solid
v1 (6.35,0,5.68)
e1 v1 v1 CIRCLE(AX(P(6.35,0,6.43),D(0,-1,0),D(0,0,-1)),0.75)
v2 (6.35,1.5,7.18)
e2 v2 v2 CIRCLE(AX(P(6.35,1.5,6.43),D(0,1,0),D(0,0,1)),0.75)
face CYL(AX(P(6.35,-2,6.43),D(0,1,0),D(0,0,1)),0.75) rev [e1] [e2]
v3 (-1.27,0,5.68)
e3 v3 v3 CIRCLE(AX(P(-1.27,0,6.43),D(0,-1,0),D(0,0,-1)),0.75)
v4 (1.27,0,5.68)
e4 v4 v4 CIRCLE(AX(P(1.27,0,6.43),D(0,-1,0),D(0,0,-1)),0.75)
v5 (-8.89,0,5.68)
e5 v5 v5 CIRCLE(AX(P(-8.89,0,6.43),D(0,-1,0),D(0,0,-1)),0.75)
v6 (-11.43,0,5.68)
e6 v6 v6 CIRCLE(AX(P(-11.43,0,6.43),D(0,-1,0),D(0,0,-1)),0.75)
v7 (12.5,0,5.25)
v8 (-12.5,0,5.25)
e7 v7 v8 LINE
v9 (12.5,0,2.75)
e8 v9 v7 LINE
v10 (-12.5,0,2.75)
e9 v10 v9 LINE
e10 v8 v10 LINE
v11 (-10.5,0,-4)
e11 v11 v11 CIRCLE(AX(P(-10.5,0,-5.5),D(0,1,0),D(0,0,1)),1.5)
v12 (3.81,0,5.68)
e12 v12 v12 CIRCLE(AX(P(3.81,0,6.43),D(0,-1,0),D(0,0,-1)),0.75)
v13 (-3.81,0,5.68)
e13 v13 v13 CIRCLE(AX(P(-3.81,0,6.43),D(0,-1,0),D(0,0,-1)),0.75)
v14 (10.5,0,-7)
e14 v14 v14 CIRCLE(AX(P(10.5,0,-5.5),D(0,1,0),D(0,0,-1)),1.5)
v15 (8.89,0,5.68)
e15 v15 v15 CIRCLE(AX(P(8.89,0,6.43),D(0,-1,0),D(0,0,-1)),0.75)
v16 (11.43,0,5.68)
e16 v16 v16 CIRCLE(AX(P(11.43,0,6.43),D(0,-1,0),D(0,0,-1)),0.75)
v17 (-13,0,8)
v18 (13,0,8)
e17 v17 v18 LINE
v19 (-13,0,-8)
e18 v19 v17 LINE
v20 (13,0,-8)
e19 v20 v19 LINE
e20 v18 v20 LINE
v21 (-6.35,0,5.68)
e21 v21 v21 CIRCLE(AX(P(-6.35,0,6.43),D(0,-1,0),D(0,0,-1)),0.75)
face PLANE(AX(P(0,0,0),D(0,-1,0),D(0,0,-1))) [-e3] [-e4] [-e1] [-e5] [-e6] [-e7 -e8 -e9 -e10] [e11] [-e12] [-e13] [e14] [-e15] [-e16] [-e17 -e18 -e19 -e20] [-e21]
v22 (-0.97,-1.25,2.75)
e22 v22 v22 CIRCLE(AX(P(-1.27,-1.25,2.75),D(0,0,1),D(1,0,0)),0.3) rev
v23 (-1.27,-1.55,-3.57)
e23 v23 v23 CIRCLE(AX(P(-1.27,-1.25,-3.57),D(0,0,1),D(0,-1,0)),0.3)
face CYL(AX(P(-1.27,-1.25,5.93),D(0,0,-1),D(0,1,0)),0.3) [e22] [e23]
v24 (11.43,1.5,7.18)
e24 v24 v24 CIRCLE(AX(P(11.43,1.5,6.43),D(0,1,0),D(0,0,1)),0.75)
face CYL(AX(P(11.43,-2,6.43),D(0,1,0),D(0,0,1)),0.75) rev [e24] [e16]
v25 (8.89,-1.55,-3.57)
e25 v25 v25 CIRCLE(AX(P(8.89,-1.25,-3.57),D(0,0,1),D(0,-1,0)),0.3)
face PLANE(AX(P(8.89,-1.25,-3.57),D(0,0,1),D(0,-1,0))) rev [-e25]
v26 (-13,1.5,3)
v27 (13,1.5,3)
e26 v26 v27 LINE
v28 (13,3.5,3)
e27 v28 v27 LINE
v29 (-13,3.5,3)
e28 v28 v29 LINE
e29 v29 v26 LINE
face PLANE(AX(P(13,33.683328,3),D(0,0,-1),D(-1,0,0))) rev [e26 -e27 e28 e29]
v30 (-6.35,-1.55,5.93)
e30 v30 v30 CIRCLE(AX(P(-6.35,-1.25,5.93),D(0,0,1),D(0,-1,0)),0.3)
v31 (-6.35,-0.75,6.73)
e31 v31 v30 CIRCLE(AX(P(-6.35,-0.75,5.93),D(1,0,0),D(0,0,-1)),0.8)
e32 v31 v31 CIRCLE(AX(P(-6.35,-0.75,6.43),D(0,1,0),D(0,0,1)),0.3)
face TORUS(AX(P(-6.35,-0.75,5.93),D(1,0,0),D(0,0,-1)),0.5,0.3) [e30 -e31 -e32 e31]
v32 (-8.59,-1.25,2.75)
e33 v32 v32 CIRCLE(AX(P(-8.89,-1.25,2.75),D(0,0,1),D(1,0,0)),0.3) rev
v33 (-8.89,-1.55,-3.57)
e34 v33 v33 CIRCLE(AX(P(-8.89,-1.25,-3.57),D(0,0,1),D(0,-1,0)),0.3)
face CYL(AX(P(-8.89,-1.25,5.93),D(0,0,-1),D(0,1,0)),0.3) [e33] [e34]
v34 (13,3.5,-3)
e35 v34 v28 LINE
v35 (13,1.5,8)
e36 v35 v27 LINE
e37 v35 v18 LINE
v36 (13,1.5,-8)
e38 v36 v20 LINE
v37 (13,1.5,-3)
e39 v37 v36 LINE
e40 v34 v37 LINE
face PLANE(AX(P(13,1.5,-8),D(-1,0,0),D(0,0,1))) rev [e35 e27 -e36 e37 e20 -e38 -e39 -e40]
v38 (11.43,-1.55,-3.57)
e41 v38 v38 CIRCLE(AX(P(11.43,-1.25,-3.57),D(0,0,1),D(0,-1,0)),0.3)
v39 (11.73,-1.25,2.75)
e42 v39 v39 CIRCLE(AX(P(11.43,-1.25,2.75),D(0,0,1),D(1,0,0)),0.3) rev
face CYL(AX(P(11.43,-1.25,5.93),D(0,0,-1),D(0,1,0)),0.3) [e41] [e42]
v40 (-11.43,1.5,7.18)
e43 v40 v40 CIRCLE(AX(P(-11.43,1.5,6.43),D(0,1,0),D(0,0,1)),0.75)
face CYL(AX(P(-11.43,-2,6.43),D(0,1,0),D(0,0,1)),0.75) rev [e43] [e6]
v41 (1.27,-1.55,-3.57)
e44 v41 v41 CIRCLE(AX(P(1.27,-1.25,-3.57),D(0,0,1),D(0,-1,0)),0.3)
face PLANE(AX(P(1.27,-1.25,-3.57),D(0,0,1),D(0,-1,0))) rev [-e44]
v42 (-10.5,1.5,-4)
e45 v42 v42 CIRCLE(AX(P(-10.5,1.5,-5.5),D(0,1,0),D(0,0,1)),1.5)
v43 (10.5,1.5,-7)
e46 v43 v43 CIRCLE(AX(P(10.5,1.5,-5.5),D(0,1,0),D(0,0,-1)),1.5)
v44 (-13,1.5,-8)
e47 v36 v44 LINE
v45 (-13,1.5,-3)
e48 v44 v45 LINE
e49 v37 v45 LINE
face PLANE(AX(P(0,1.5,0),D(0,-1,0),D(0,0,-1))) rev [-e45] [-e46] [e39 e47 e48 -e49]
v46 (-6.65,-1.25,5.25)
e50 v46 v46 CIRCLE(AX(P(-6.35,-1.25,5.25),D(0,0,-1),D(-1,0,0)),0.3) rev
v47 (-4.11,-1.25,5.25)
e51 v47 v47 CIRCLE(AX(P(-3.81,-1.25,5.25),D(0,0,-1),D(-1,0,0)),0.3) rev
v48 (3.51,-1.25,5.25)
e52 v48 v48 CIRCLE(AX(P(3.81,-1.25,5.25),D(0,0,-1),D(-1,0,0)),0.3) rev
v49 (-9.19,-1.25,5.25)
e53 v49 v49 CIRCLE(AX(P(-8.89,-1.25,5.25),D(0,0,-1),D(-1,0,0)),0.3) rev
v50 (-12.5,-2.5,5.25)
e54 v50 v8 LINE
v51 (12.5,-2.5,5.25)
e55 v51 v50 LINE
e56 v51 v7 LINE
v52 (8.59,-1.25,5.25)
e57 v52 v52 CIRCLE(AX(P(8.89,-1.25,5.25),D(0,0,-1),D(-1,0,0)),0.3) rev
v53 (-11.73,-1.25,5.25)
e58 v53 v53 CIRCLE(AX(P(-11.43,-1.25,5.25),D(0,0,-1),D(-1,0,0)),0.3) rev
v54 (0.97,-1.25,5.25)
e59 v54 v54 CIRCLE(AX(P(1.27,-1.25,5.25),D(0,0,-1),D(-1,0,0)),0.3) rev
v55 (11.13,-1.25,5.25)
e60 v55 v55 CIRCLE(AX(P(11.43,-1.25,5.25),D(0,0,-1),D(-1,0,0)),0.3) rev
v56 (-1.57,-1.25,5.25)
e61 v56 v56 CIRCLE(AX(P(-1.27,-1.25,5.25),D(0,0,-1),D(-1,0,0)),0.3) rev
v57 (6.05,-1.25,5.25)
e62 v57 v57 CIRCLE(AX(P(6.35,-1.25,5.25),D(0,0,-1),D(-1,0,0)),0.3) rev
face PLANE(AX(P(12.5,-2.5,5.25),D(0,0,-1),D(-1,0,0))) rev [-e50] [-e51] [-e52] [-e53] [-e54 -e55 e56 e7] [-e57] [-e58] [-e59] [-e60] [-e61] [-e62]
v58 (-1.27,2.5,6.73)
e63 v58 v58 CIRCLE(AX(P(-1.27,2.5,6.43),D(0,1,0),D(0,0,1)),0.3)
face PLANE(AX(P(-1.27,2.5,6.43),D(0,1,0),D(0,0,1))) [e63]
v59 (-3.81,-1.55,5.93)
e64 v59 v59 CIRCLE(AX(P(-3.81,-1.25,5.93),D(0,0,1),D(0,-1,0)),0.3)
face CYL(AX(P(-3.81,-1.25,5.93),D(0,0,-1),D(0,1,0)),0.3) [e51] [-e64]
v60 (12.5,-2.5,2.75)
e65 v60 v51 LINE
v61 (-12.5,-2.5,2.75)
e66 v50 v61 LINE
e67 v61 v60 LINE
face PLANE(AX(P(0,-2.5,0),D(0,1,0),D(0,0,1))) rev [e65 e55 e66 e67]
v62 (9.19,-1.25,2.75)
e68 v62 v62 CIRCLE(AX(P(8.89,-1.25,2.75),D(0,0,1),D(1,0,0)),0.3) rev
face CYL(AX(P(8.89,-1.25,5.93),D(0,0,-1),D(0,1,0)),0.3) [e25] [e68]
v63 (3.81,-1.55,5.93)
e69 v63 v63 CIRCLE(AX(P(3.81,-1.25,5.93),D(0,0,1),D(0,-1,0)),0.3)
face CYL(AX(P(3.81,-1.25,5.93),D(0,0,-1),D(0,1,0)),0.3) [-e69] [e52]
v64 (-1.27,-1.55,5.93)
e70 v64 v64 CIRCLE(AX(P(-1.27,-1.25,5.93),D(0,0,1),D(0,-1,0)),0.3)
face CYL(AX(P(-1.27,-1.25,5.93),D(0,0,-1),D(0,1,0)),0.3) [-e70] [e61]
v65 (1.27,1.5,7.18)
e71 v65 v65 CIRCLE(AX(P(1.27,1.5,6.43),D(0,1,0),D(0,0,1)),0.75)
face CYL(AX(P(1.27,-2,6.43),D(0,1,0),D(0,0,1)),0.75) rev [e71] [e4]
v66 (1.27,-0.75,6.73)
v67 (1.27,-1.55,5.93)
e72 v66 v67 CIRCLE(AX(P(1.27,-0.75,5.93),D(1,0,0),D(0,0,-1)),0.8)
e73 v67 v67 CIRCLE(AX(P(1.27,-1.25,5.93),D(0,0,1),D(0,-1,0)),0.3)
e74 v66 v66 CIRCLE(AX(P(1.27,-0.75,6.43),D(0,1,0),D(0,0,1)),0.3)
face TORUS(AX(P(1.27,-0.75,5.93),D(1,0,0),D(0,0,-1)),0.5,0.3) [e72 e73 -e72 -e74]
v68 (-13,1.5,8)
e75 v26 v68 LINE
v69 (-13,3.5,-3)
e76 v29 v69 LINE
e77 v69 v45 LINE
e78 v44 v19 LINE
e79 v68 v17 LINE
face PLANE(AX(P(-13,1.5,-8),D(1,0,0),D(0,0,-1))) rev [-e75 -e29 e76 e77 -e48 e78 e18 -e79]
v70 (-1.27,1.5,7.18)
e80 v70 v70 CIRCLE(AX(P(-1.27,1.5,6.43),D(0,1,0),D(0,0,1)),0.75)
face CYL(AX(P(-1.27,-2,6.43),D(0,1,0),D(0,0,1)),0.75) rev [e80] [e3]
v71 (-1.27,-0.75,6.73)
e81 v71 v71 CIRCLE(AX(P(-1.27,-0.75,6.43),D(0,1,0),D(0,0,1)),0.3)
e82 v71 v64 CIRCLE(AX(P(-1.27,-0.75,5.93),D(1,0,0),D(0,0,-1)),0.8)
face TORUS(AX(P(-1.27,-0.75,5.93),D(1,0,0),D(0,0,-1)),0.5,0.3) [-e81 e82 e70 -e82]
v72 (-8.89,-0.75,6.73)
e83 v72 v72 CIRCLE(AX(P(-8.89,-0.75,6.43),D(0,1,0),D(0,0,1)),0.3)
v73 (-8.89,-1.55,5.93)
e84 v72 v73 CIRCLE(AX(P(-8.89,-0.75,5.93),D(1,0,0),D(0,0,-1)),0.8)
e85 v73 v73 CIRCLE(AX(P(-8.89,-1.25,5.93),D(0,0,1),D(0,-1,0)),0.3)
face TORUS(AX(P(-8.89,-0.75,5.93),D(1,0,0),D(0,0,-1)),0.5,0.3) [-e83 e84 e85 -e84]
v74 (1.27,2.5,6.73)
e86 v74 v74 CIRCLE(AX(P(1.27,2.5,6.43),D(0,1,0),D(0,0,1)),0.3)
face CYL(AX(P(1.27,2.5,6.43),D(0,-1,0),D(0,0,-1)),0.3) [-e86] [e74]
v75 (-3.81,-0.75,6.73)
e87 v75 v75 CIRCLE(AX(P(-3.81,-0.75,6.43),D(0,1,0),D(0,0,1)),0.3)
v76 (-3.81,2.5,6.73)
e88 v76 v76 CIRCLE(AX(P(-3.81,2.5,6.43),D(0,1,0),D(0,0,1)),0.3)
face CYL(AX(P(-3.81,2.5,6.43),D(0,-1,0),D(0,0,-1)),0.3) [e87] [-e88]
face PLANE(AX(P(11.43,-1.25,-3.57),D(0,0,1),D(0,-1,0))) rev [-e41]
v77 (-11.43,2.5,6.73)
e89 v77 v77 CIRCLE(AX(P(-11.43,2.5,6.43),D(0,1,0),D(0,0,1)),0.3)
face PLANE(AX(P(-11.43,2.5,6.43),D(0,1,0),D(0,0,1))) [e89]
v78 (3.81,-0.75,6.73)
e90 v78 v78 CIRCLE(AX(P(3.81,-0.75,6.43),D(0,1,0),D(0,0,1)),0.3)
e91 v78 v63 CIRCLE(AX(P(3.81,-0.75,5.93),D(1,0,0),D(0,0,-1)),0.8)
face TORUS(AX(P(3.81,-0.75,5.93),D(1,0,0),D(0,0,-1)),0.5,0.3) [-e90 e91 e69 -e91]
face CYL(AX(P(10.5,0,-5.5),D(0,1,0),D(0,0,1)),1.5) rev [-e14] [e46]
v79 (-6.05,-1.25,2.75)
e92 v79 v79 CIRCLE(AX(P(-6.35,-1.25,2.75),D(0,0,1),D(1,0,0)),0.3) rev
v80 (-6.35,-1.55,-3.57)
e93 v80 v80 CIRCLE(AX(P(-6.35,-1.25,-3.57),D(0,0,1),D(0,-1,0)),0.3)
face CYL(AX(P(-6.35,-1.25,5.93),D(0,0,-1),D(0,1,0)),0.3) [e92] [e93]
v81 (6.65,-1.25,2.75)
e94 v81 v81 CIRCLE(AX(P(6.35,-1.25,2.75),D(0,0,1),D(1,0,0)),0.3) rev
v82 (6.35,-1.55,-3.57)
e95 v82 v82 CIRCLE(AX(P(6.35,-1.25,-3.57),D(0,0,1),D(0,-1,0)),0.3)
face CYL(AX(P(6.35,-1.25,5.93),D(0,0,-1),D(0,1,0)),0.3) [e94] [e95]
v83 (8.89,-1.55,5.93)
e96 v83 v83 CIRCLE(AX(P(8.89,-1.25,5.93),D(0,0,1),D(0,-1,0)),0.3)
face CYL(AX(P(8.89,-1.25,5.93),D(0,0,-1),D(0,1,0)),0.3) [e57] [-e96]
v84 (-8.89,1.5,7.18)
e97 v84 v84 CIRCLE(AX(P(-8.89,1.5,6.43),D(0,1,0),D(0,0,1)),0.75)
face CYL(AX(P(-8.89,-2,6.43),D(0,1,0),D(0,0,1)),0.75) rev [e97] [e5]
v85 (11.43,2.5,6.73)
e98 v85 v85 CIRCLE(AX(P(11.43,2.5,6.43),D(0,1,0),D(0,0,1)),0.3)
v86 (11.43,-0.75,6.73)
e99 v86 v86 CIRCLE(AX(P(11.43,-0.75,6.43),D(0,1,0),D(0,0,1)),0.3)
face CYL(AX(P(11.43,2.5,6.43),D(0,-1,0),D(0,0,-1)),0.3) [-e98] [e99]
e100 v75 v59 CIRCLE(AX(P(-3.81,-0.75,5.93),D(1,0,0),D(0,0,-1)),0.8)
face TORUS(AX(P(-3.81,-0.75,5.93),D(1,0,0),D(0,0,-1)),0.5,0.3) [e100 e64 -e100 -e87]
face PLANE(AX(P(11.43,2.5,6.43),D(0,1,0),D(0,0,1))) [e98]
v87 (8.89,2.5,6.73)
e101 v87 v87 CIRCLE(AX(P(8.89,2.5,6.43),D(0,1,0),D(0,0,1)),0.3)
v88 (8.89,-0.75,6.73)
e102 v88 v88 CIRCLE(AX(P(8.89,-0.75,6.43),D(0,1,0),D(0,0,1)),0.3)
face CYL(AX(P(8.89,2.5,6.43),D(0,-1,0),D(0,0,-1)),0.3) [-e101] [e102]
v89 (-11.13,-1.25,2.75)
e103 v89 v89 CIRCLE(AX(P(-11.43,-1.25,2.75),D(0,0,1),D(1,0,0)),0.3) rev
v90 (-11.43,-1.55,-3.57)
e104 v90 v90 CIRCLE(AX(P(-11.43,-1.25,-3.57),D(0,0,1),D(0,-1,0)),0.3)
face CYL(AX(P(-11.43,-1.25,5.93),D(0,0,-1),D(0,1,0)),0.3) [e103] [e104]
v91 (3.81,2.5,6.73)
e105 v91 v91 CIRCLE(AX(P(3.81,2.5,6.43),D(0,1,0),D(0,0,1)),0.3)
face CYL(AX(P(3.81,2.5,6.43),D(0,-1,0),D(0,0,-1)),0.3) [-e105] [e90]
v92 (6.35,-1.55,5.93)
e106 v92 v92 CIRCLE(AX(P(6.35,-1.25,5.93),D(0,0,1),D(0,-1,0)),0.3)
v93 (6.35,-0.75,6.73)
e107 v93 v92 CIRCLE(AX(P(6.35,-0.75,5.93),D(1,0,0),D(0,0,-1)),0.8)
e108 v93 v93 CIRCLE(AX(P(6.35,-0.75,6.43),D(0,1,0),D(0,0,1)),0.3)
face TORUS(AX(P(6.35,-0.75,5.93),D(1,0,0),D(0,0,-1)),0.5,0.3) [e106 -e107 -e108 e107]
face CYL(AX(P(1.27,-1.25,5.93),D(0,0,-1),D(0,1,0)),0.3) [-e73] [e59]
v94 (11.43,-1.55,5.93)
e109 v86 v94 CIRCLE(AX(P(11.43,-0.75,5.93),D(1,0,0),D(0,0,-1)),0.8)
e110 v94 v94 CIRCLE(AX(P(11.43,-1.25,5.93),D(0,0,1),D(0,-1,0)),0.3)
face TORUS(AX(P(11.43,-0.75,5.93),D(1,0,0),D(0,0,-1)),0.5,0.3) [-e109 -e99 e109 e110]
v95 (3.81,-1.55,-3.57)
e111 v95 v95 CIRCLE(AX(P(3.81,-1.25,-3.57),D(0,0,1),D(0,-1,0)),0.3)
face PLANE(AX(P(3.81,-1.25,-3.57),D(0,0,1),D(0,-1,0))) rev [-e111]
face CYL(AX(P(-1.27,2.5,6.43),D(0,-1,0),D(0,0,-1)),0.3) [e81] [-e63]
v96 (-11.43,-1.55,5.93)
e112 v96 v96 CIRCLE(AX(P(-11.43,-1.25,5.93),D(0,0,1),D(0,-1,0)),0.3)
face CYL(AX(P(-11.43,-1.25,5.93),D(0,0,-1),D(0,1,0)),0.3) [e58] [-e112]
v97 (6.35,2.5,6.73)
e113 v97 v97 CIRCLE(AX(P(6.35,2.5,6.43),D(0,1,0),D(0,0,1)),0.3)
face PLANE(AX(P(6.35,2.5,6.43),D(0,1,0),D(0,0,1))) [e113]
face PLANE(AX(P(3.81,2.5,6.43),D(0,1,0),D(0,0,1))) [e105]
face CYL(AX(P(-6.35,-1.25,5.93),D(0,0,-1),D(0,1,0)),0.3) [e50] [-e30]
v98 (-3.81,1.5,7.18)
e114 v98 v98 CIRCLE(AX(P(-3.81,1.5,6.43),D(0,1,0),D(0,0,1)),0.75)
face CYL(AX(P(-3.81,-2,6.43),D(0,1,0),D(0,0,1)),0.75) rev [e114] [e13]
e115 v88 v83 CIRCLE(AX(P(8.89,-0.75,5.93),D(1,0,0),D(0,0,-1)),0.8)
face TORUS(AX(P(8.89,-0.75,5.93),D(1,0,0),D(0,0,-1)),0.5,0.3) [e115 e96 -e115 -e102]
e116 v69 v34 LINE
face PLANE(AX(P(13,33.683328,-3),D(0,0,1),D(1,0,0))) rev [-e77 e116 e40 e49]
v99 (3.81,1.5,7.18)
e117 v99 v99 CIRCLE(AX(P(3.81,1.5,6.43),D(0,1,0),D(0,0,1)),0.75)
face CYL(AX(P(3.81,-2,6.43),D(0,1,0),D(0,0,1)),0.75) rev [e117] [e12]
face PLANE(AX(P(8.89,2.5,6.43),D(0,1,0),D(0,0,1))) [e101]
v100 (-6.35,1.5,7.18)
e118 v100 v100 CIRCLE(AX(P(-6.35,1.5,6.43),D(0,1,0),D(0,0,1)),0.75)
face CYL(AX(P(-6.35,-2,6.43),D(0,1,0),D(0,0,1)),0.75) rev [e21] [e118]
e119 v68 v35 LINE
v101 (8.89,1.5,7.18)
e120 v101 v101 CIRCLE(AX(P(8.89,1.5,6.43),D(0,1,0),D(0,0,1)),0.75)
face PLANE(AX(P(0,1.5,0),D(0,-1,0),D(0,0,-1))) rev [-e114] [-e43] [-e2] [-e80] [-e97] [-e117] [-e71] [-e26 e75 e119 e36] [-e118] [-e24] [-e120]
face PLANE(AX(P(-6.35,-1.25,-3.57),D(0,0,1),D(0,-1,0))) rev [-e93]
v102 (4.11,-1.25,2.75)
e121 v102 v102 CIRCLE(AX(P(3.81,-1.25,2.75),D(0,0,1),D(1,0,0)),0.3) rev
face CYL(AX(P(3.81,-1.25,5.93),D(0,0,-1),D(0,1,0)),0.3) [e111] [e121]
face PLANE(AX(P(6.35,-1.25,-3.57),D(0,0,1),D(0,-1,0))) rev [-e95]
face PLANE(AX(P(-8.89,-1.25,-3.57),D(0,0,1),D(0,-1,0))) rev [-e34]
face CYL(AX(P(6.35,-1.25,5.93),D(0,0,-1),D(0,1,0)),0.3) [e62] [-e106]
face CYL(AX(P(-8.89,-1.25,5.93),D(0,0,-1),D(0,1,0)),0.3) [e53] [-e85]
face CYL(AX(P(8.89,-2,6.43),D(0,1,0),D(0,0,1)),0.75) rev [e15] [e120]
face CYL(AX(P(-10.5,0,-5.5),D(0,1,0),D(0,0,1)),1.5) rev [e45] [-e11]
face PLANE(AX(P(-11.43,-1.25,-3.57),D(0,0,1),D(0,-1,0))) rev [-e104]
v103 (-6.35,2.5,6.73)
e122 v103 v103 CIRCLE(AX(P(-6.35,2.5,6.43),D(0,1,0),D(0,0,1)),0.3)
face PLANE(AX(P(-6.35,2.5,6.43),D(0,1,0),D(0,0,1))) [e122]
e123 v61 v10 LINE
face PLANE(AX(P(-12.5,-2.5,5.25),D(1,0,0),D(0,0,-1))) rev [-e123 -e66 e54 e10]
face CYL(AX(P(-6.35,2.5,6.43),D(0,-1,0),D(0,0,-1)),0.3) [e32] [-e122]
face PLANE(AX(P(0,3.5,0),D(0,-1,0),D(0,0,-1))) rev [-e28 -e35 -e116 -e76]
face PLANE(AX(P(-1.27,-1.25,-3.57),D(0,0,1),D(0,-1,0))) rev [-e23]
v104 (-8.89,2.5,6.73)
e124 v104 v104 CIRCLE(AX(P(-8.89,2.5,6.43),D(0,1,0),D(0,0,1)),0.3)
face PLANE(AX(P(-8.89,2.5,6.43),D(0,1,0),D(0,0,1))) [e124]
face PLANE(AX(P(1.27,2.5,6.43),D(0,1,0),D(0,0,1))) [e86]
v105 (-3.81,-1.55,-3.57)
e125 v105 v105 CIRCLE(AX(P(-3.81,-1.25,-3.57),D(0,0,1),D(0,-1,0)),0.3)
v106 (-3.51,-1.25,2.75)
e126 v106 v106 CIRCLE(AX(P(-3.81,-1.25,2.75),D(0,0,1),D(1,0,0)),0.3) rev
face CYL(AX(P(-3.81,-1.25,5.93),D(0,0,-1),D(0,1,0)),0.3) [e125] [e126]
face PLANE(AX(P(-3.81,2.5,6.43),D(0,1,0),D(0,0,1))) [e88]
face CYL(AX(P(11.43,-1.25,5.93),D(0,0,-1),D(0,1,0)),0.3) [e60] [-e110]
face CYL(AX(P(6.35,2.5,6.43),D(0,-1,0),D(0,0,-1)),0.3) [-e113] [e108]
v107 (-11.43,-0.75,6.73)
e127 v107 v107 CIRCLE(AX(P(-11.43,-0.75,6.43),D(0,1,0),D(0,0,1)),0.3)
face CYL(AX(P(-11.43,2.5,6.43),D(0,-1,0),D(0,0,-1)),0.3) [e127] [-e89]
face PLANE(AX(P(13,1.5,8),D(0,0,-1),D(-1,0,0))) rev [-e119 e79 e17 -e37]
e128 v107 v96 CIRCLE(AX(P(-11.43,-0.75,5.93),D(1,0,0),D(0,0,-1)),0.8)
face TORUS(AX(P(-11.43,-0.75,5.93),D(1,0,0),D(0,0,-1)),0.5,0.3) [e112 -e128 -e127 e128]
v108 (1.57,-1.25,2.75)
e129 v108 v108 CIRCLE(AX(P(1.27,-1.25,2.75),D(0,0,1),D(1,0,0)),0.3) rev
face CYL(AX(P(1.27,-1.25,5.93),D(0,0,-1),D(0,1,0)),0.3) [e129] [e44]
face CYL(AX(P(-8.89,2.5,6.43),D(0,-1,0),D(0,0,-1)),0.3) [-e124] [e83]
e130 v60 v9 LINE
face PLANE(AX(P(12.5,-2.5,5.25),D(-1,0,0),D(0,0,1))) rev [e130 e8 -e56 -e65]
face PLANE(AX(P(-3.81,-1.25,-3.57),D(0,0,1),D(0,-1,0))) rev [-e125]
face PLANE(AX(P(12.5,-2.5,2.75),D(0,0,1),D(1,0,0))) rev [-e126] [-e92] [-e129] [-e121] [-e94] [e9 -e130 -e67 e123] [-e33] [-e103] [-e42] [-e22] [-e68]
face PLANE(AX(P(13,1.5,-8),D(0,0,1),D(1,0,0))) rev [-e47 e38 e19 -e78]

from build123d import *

# Parameters (mm, degrees)
SKETCH_1_W                    = 26
SKETCH_1_H                    = 16
EXTRUDE_1_DEPTH               = 1.5
SKETCH_2_R                    = 1.5
CUT_EXTRUDE_1_DEPTH           = 16.33786165
SKETCH_3_R                    = 0.75
CUT_EXTRUDE_2_DEPTH           = 3.5
SKETCH_4_W                    = 26
SKETCH_4_H                    = 6
EXTRUDE_2_DEPTH               = 2
SKETCH_7_W                    = 25
SKETCH_7_H                    = 2.5
EXTRUDE_4_DEPTH               = 2.5
SWEEP_1_OUTLINE_R             = 0.3
SWEEP_1_ANGLE                 = 90
SWEEP_START                   = -0.7500001
SWEEP_1_2_OUTLINE_R           = 0.3
SWEEP_1_2_DEPTH               = 3.2500001
SWEEP_START_2                 = 4
SWEEP_1_3_OUTLINE_R           = 0.3
SWEEP_1_3_DEPTH               = 1.9300001
SWEEP_START_3                 = -3.57
SWEEP_1_4_OUTLINE_R           = 0.3
SWEEP_1_4_DEPTH               = 7.57
PATTERN_LINEAR_1_OUTLINE_R    = 0.3
PATTERN_LINEAR_1_ANGLE        = 90
PATTERN_START                 = -0.7500001
PATTERN_LINEAR_1_2_OUTLINE_R  = 0.3
PATTERN_LINEAR_1_2_DEPTH      = 3.2500001
PATTERN_START_2               = 4
PATTERN_LINEAR_1_3_OUTLINE_R  = 0.3
PATTERN_LINEAR_1_3_DEPTH      = 1.9300001
PATTERN_START_3               = -3.57
PATTERN_LINEAR_1_4_OUTLINE_R  = 0.3
PATTERN_LINEAR_1_4_DEPTH      = 7.57
PATTERN_LINEAR_1_5_OUTLINE_R  = 0.3
PATTERN_LINEAR_1_5_DEPTH      = 3.2500001
PATTERN_LINEAR_1_6_OUTLINE_R  = 0.3
PATTERN_LINEAR_1_6_DEPTH      = 1.9300001
PATTERN_LINEAR_1_7_OUTLINE_R  = 0.3
PATTERN_LINEAR_1_7_DEPTH      = 7.57
PATTERN_LINEAR_1_8_OUTLINE_R  = 0.3
PATTERN_LINEAR_1_8_DEPTH      = 3.2500001
PATTERN_LINEAR_1_9_OUTLINE_R  = 0.3
PATTERN_LINEAR_1_9_DEPTH      = 1.9300001
PATTERN_LINEAR_1_10_OUTLINE_R = 0.3
PATTERN_LINEAR_1_10_DEPTH     = 7.57
PATTERN_LINEAR_1_11_OUTLINE_R = 0.3
PATTERN_LINEAR_1_11_DEPTH     = 3.2500001
PATTERN_LINEAR_1_12_OUTLINE_R = 0.3
PATTERN_LINEAR_1_12_DEPTH     = 1.9300001
PATTERN_LINEAR_1_13_OUTLINE_R = 0.3
PATTERN_LINEAR_1_13_DEPTH     = 7.57
PATTERN_LINEAR_1_14_OUTLINE_R = 0.3
PATTERN_LINEAR_1_14_DEPTH     = 3.2500001
PATTERN_LINEAR_1_15_OUTLINE_R = 0.3
PATTERN_LINEAR_1_15_DEPTH     = 1.9300001
PATTERN_LINEAR_1_16_OUTLINE_R = 0.3
PATTERN_LINEAR_1_16_DEPTH     = 7.57
PATTERN_LINEAR_1_17_OUTLINE_R = 0.3
PATTERN_LINEAR_1_17_DEPTH     = 3.2500001
PATTERN_LINEAR_1_18_OUTLINE_R = 0.3
PATTERN_LINEAR_1_18_DEPTH     = 1.9300001
PATTERN_LINEAR_1_19_OUTLINE_R = 0.3
PATTERN_LINEAR_1_19_DEPTH     = 7.57
PATTERN_LINEAR_1_20_OUTLINE_R = 0.3
PATTERN_LINEAR_1_20_DEPTH     = 3.2500001
PATTERN_LINEAR_1_21_OUTLINE_R = 0.3
PATTERN_LINEAR_1_21_DEPTH     = 1.9300001
PATTERN_LINEAR_1_22_OUTLINE_R = 0.3
PATTERN_LINEAR_1_22_DEPTH     = 7.57
PATTERN_LINEAR_1_23_OUTLINE_R = 0.3
PATTERN_LINEAR_1_23_DEPTH     = 3.2500001
PATTERN_LINEAR_1_24_OUTLINE_R = 0.3
PATTERN_LINEAR_1_24_DEPTH     = 1.9300001
PATTERN_LINEAR_1_25_OUTLINE_R = 0.3
PATTERN_LINEAR_1_25_DEPTH     = 7.57
PATTERN_LINEAR_1_26_OUTLINE_R = 0.3
PATTERN_LINEAR_1_26_DEPTH     = 3.2500001
PATTERN_LINEAR_1_27_OUTLINE_R = 0.3
PATTERN_LINEAR_1_27_DEPTH     = 1.9300001
PATTERN_LINEAR_1_28_OUTLINE_R = 0.3
PATTERN_LINEAR_1_28_DEPTH     = 7.57


with BuildPart() as part:
    # 스케치1 → 보스-돌출1 (new body)
    with BuildSketch(Plane(origin=(0, 0, 0), x_dir=(1, 0, 0), z_dir=(0, 1, 0))):
        Rectangle(SKETCH_1_W, SKETCH_1_H)
    extrude(amount=EXTRUDE_1_DEPTH)

    # 스케치2 → 컷-돌출1 (cut, through all)
    with BuildSketch(Plane(origin=(0, 1.5, 0), x_dir=(1, 0, 0), z_dir=(0, 1, 0))):
        with Locations(Location((-10.5, 5.5, 0), (0, 0, 270))):
            Circle(SKETCH_2_R)
        with Locations(Location((10.5, 5.5, 0), (0, 0, 90))):
            Circle(SKETCH_2_R)
    extrude(amount=-CUT_EXTRUDE_1_DEPTH, mode=Mode.SUBTRACT)

    # 스케치3 → 컷-돌출2 (cut)
    with BuildSketch(Plane(origin=(0, 1.5, 0), x_dir=(1, 0, 0), z_dir=(0, 1, 0))):
        with Locations(Location((-11.43, -6.43, 0), (0, 0, 270))):
            Circle(SKETCH_3_R)
        with Locations(Location((-8.89, -6.43, 0), (0, 0, 270))):
            Circle(SKETCH_3_R)
        with Locations(Location((-6.35, -6.43, 0), (0, 0, 270))):
            Circle(SKETCH_3_R)
        with Locations(Location((-3.81, -6.43, 0), (0, 0, 270))):
            Circle(SKETCH_3_R)
        with Locations(Location((-1.27, -6.43, 0), (0, 0, 270))):
            Circle(SKETCH_3_R)
        with Locations(Location((1.27, -6.43, 0), (0, 0, 270))):
            Circle(SKETCH_3_R)
        with Locations(Location((3.81, -6.43, 0), (0, 0, 270))):
            Circle(SKETCH_3_R)
        with Locations(Location((6.35, -6.43, 0), (0, 0, 270))):
            Circle(SKETCH_3_R)
        with Locations(Location((8.89, -6.43, 0), (0, 0, 270))):
            Circle(SKETCH_3_R)
        with Locations(Location((11.43, -6.43, 0), (0, 0, 270))):
            Circle(SKETCH_3_R)
    extrude(amount=-CUT_EXTRUDE_2_DEPTH, mode=Mode.SUBTRACT)

    # 스케치4 → 보스-돌출2 (add)
    with BuildSketch(Plane(origin=(0, 1.5, 0), x_dir=(1, 0, 0), z_dir=(0, 1, 0))):
        Rectangle(SKETCH_4_W, SKETCH_4_H)
    extrude(amount=EXTRUDE_2_DEPTH)

    # 스케치7 → 보스-돌출4 (add)
    with BuildSketch(Plane.XZ):
        with Locations((0, 4)):
            Rectangle(SKETCH_7_W, SKETCH_7_H)
    extrude(amount=EXTRUDE_4_DEPTH)



with BuildPart() as body_2:
    # 스윕1: read off the stored shape, not the designer's step
    # 스윕1 outline → 스윕1 (revolve)
    with BuildSketch(Plane(origin=(0, -0.75, 5.93), x_dir=(0, 0, 1), z_dir=(0, 1, 0))):
        with Locations((0.5, -11.43)):
            Circle(SWEEP_1_OUTLINE_R)
    revolve(axis=Axis((0, -0.75, 5.93), (1, 0, 0)), revolution_arc=SWEEP_1_ANGLE)

    # Sweep 1 2 outline → Sweep 1 2 (add)
    with BuildSketch(Plane(origin=(0, 0, 0), x_dir=(1, 0, 0), z_dir=(0, 1, 0)).offset(SWEEP_START)):
        with Locations((-11.43, -6.43)):
            Circle(SWEEP_1_2_OUTLINE_R)
    extrude(amount=SWEEP_1_2_DEPTH)


with BuildPart() as part_1:
    add(part.part)

    add(body_2.part)  # Sweep 1 3 merges body 2
    # Sweep 1 3 outline → Sweep 1 3 (add)
    with BuildSketch(Plane.XY.offset(SWEEP_START_2)):
        with Locations((-11.43, -1.25)):
            Circle(SWEEP_1_3_OUTLINE_R)
    extrude(amount=SWEEP_1_3_DEPTH)

    # Sweep 1 4 outline → Sweep 1 4 (add)
    with BuildSketch(Plane.XY.offset(SWEEP_START_3)):
        with Locations((-11.43, -1.25)):
            Circle(SWEEP_1_4_OUTLINE_R)
    extrude(amount=SWEEP_1_4_DEPTH)



with BuildPart() as body_2_2:
    # 선형 패턴1: read off the stored shape, not the designer's step
    # 선형 패턴1 outline → 선형 패턴1 (revolve)
    with BuildSketch(Plane(origin=(0, -0.75, 5.93), x_dir=(0, 0, 1), z_dir=(0, 1, 0))):
        with Locations((0.5, -8.89)):
            Circle(PATTERN_LINEAR_1_OUTLINE_R)
        with Locations((0.5, -6.35)):
            Circle(PATTERN_LINEAR_1_OUTLINE_R)
        with Locations((0.5, -3.81)):
            Circle(PATTERN_LINEAR_1_OUTLINE_R)
        with Locations((0.5, -1.27)):
            Circle(PATTERN_LINEAR_1_OUTLINE_R)
        with Locations((0.5, 1.27)):
            Circle(PATTERN_LINEAR_1_OUTLINE_R)
        with Locations((0.5, 3.81)):
            Circle(PATTERN_LINEAR_1_OUTLINE_R)
        with Locations((0.5, 6.35)):
            Circle(PATTERN_LINEAR_1_OUTLINE_R)
        with Locations((0.5, 8.89)):
            Circle(PATTERN_LINEAR_1_OUTLINE_R)
        with Locations((0.5, 11.43)):
            Circle(PATTERN_LINEAR_1_OUTLINE_R)
    revolve(axis=Axis((0, -0.75, 5.93), (1, 0, 0)), revolution_arc=PATTERN_LINEAR_1_ANGLE)

    # Pattern Linear 1 2 outline → Pattern Linear 1 2 (add)
    with BuildSketch(Plane(origin=(0, 0, 0), x_dir=(1, 0, 0), z_dir=(0, 1, 0)).offset(PATTERN_START)):
        with Locations((-8.89, -6.43)):
            Circle(PATTERN_LINEAR_1_2_OUTLINE_R)
    extrude(amount=PATTERN_LINEAR_1_2_DEPTH)


with BuildPart() as part_2:
    add(part_1.part)

    add(body_2_2.part)  # Pattern Linear 1 3 merges body 2 2
    # Pattern Linear 1 3 outline → Pattern Linear 1 3 (add)
    with BuildSketch(Plane.XY.offset(PATTERN_START_2)):
        with Locations((-8.89, -1.25)):
            Circle(PATTERN_LINEAR_1_3_OUTLINE_R)
    extrude(amount=PATTERN_LINEAR_1_3_DEPTH)

    # Pattern Linear 1 4 outline → Pattern Linear 1 4 (add)
    with BuildSketch(Plane.XY.offset(PATTERN_START_3)):
        with Locations((-8.89, -1.25)):
            Circle(PATTERN_LINEAR_1_4_OUTLINE_R)
    extrude(amount=PATTERN_LINEAR_1_4_DEPTH)

    # Pattern Linear 1 5 outline → Pattern Linear 1 5 (add)
    with BuildSketch(Plane(origin=(0, 0, 0), x_dir=(1, 0, 0), z_dir=(0, 1, 0)).offset(PATTERN_START)):
        with Locations((-6.35, -6.43)):
            Circle(PATTERN_LINEAR_1_5_OUTLINE_R)
    extrude(amount=PATTERN_LINEAR_1_5_DEPTH)

    # Pattern Linear 1 6 outline → Pattern Linear 1 6 (add)
    with BuildSketch(Plane.XY.offset(PATTERN_START_2)):
        with Locations((-6.35, -1.25)):
            Circle(PATTERN_LINEAR_1_6_OUTLINE_R)
    extrude(amount=PATTERN_LINEAR_1_6_DEPTH)

    # Pattern Linear 1 7 outline → Pattern Linear 1 7 (add)
    with BuildSketch(Plane.XY.offset(PATTERN_START_3)):
        with Locations((-6.35, -1.25)):
            Circle(PATTERN_LINEAR_1_7_OUTLINE_R)
    extrude(amount=PATTERN_LINEAR_1_7_DEPTH)

    # Pattern Linear 1 8 outline → Pattern Linear 1 8 (add)
    with BuildSketch(Plane(origin=(0, 0, 0), x_dir=(1, 0, 0), z_dir=(0, 1, 0)).offset(PATTERN_START)):
        with Locations((-3.81, -6.43)):
            Circle(PATTERN_LINEAR_1_8_OUTLINE_R)
    extrude(amount=PATTERN_LINEAR_1_8_DEPTH)

    # Pattern Linear 1 9 outline → Pattern Linear 1 9 (add)
    with BuildSketch(Plane.XY.offset(PATTERN_START_2)):
        with Locations((-3.81, -1.25)):
            Circle(PATTERN_LINEAR_1_9_OUTLINE_R)
    extrude(amount=PATTERN_LINEAR_1_9_DEPTH)

    # Pattern Linear 1 10 outline → Pattern Linear 1 10 (add)
    with BuildSketch(Plane.XY.offset(PATTERN_START_3)):
        with Locations((-3.81, -1.25)):
            Circle(PATTERN_LINEAR_1_10_OUTLINE_R)
    extrude(amount=PATTERN_LINEAR_1_10_DEPTH)

    # Pattern Linear 1 11 outline → Pattern Linear 1 11 (add)
    with BuildSketch(Plane(origin=(0, 0, 0), x_dir=(1, 0, 0), z_dir=(0, 1, 0)).offset(PATTERN_START)):
        with Locations((-1.27, -6.43)):
            Circle(PATTERN_LINEAR_1_11_OUTLINE_R)
    extrude(amount=PATTERN_LINEAR_1_11_DEPTH)

    # Pattern Linear 1 12 outline → Pattern Linear 1 12 (add)
    with BuildSketch(Plane.XY.offset(PATTERN_START_2)):
        with Locations((-1.27, -1.25)):
            Circle(PATTERN_LINEAR_1_12_OUTLINE_R)
    extrude(amount=PATTERN_LINEAR_1_12_DEPTH)

    # Pattern Linear 1 13 outline → Pattern Linear 1 13 (add)
    with BuildSketch(Plane.XY.offset(PATTERN_START_3)):
        with Locations((-1.27, -1.25)):
            Circle(PATTERN_LINEAR_1_13_OUTLINE_R)
    extrude(amount=PATTERN_LINEAR_1_13_DEPTH)

    # Pattern Linear 1 14 outline → Pattern Linear 1 14 (add)
    with BuildSketch(Plane(origin=(0, 0, 0), x_dir=(1, 0, 0), z_dir=(0, 1, 0)).offset(PATTERN_START)):
        with Locations((1.27, -6.43)):
            Circle(PATTERN_LINEAR_1_14_OUTLINE_R)
    extrude(amount=PATTERN_LINEAR_1_14_DEPTH)

    # Pattern Linear 1 15 outline → Pattern Linear 1 15 (add)
    with BuildSketch(Plane.XY.offset(PATTERN_START_2)):
        with Locations((1.27, -1.25)):
            Circle(PATTERN_LINEAR_1_15_OUTLINE_R)
    extrude(amount=PATTERN_LINEAR_1_15_DEPTH)

    # Pattern Linear 1 16 outline → Pattern Linear 1 16 (add)
    with BuildSketch(Plane.XY.offset(PATTERN_START_3)):
        with Locations((1.27, -1.25)):
            Circle(PATTERN_LINEAR_1_16_OUTLINE_R)
    extrude(amount=PATTERN_LINEAR_1_16_DEPTH)

    # Pattern Linear 1 17 outline → Pattern Linear 1 17 (add)
    with BuildSketch(Plane(origin=(0, 0, 0), x_dir=(1, 0, 0), z_dir=(0, 1, 0)).offset(PATTERN_START)):
        with Locations((3.81, -6.43)):
            Circle(PATTERN_LINEAR_1_17_OUTLINE_R)
    extrude(amount=PATTERN_LINEAR_1_17_DEPTH)

    # Pattern Linear 1 18 outline → Pattern Linear 1 18 (add)
    with BuildSketch(Plane.XY.offset(PATTERN_START_2)):
        with Locations((3.81, -1.25)):
            Circle(PATTERN_LINEAR_1_18_OUTLINE_R)
    extrude(amount=PATTERN_LINEAR_1_18_DEPTH)

    # Pattern Linear 1 19 outline → Pattern Linear 1 19 (add)
    with BuildSketch(Plane.XY.offset(PATTERN_START_3)):
        with Locations((3.81, -1.25)):
            Circle(PATTERN_LINEAR_1_19_OUTLINE_R)
    extrude(amount=PATTERN_LINEAR_1_19_DEPTH)

    # Pattern Linear 1 20 outline → Pattern Linear 1 20 (add)
    with BuildSketch(Plane(origin=(0, 0, 0), x_dir=(1, 0, 0), z_dir=(0, 1, 0)).offset(PATTERN_START)):
        with Locations((6.35, -6.43)):
            Circle(PATTERN_LINEAR_1_20_OUTLINE_R)
    extrude(amount=PATTERN_LINEAR_1_20_DEPTH)

    # Pattern Linear 1 21 outline → Pattern Linear 1 21 (add)
    with BuildSketch(Plane.XY.offset(PATTERN_START_2)):
        with Locations((6.35, -1.25)):
            Circle(PATTERN_LINEAR_1_21_OUTLINE_R)
    extrude(amount=PATTERN_LINEAR_1_21_DEPTH)

    # Pattern Linear 1 22 outline → Pattern Linear 1 22 (add)
    with BuildSketch(Plane.XY.offset(PATTERN_START_3)):
        with Locations((6.35, -1.25)):
            Circle(PATTERN_LINEAR_1_22_OUTLINE_R)
    extrude(amount=PATTERN_LINEAR_1_22_DEPTH)

    # Pattern Linear 1 23 outline → Pattern Linear 1 23 (add)
    with BuildSketch(Plane(origin=(0, 0, 0), x_dir=(1, 0, 0), z_dir=(0, 1, 0)).offset(PATTERN_START)):
        with Locations((8.89, -6.43)):
            Circle(PATTERN_LINEAR_1_23_OUTLINE_R)
    extrude(amount=PATTERN_LINEAR_1_23_DEPTH)

    # Pattern Linear 1 24 outline → Pattern Linear 1 24 (add)
    with BuildSketch(Plane.XY.offset(PATTERN_START_2)):
        with Locations((8.89, -1.25)):
            Circle(PATTERN_LINEAR_1_24_OUTLINE_R)
    extrude(amount=PATTERN_LINEAR_1_24_DEPTH)

    # Pattern Linear 1 25 outline → Pattern Linear 1 25 (add)
    with BuildSketch(Plane.XY.offset(PATTERN_START_3)):
        with Locations((8.89, -1.25)):
            Circle(PATTERN_LINEAR_1_25_OUTLINE_R)
    extrude(amount=PATTERN_LINEAR_1_25_DEPTH)

    # Pattern Linear 1 26 outline → Pattern Linear 1 26 (add)
    with BuildSketch(Plane(origin=(0, 0, 0), x_dir=(1, 0, 0), z_dir=(0, 1, 0)).offset(PATTERN_START)):
        with Locations((11.43, -6.43)):
            Circle(PATTERN_LINEAR_1_26_OUTLINE_R)
    extrude(amount=PATTERN_LINEAR_1_26_DEPTH)

    # Pattern Linear 1 27 outline → Pattern Linear 1 27 (add)
    with BuildSketch(Plane.XY.offset(PATTERN_START_2)):
        with Locations((11.43, -1.25)):
            Circle(PATTERN_LINEAR_1_27_OUTLINE_R)
    extrude(amount=PATTERN_LINEAR_1_27_DEPTH)

    # Pattern Linear 1 28 outline → Pattern Linear 1 28 (add)
    with BuildSketch(Plane.XY.offset(PATTERN_START_3)):
        with Locations((11.43, -1.25)):
            Circle(PATTERN_LINEAR_1_28_OUTLINE_R)
    extrude(amount=PATTERN_LINEAR_1_28_DEPTH)


solid = part_2.part
